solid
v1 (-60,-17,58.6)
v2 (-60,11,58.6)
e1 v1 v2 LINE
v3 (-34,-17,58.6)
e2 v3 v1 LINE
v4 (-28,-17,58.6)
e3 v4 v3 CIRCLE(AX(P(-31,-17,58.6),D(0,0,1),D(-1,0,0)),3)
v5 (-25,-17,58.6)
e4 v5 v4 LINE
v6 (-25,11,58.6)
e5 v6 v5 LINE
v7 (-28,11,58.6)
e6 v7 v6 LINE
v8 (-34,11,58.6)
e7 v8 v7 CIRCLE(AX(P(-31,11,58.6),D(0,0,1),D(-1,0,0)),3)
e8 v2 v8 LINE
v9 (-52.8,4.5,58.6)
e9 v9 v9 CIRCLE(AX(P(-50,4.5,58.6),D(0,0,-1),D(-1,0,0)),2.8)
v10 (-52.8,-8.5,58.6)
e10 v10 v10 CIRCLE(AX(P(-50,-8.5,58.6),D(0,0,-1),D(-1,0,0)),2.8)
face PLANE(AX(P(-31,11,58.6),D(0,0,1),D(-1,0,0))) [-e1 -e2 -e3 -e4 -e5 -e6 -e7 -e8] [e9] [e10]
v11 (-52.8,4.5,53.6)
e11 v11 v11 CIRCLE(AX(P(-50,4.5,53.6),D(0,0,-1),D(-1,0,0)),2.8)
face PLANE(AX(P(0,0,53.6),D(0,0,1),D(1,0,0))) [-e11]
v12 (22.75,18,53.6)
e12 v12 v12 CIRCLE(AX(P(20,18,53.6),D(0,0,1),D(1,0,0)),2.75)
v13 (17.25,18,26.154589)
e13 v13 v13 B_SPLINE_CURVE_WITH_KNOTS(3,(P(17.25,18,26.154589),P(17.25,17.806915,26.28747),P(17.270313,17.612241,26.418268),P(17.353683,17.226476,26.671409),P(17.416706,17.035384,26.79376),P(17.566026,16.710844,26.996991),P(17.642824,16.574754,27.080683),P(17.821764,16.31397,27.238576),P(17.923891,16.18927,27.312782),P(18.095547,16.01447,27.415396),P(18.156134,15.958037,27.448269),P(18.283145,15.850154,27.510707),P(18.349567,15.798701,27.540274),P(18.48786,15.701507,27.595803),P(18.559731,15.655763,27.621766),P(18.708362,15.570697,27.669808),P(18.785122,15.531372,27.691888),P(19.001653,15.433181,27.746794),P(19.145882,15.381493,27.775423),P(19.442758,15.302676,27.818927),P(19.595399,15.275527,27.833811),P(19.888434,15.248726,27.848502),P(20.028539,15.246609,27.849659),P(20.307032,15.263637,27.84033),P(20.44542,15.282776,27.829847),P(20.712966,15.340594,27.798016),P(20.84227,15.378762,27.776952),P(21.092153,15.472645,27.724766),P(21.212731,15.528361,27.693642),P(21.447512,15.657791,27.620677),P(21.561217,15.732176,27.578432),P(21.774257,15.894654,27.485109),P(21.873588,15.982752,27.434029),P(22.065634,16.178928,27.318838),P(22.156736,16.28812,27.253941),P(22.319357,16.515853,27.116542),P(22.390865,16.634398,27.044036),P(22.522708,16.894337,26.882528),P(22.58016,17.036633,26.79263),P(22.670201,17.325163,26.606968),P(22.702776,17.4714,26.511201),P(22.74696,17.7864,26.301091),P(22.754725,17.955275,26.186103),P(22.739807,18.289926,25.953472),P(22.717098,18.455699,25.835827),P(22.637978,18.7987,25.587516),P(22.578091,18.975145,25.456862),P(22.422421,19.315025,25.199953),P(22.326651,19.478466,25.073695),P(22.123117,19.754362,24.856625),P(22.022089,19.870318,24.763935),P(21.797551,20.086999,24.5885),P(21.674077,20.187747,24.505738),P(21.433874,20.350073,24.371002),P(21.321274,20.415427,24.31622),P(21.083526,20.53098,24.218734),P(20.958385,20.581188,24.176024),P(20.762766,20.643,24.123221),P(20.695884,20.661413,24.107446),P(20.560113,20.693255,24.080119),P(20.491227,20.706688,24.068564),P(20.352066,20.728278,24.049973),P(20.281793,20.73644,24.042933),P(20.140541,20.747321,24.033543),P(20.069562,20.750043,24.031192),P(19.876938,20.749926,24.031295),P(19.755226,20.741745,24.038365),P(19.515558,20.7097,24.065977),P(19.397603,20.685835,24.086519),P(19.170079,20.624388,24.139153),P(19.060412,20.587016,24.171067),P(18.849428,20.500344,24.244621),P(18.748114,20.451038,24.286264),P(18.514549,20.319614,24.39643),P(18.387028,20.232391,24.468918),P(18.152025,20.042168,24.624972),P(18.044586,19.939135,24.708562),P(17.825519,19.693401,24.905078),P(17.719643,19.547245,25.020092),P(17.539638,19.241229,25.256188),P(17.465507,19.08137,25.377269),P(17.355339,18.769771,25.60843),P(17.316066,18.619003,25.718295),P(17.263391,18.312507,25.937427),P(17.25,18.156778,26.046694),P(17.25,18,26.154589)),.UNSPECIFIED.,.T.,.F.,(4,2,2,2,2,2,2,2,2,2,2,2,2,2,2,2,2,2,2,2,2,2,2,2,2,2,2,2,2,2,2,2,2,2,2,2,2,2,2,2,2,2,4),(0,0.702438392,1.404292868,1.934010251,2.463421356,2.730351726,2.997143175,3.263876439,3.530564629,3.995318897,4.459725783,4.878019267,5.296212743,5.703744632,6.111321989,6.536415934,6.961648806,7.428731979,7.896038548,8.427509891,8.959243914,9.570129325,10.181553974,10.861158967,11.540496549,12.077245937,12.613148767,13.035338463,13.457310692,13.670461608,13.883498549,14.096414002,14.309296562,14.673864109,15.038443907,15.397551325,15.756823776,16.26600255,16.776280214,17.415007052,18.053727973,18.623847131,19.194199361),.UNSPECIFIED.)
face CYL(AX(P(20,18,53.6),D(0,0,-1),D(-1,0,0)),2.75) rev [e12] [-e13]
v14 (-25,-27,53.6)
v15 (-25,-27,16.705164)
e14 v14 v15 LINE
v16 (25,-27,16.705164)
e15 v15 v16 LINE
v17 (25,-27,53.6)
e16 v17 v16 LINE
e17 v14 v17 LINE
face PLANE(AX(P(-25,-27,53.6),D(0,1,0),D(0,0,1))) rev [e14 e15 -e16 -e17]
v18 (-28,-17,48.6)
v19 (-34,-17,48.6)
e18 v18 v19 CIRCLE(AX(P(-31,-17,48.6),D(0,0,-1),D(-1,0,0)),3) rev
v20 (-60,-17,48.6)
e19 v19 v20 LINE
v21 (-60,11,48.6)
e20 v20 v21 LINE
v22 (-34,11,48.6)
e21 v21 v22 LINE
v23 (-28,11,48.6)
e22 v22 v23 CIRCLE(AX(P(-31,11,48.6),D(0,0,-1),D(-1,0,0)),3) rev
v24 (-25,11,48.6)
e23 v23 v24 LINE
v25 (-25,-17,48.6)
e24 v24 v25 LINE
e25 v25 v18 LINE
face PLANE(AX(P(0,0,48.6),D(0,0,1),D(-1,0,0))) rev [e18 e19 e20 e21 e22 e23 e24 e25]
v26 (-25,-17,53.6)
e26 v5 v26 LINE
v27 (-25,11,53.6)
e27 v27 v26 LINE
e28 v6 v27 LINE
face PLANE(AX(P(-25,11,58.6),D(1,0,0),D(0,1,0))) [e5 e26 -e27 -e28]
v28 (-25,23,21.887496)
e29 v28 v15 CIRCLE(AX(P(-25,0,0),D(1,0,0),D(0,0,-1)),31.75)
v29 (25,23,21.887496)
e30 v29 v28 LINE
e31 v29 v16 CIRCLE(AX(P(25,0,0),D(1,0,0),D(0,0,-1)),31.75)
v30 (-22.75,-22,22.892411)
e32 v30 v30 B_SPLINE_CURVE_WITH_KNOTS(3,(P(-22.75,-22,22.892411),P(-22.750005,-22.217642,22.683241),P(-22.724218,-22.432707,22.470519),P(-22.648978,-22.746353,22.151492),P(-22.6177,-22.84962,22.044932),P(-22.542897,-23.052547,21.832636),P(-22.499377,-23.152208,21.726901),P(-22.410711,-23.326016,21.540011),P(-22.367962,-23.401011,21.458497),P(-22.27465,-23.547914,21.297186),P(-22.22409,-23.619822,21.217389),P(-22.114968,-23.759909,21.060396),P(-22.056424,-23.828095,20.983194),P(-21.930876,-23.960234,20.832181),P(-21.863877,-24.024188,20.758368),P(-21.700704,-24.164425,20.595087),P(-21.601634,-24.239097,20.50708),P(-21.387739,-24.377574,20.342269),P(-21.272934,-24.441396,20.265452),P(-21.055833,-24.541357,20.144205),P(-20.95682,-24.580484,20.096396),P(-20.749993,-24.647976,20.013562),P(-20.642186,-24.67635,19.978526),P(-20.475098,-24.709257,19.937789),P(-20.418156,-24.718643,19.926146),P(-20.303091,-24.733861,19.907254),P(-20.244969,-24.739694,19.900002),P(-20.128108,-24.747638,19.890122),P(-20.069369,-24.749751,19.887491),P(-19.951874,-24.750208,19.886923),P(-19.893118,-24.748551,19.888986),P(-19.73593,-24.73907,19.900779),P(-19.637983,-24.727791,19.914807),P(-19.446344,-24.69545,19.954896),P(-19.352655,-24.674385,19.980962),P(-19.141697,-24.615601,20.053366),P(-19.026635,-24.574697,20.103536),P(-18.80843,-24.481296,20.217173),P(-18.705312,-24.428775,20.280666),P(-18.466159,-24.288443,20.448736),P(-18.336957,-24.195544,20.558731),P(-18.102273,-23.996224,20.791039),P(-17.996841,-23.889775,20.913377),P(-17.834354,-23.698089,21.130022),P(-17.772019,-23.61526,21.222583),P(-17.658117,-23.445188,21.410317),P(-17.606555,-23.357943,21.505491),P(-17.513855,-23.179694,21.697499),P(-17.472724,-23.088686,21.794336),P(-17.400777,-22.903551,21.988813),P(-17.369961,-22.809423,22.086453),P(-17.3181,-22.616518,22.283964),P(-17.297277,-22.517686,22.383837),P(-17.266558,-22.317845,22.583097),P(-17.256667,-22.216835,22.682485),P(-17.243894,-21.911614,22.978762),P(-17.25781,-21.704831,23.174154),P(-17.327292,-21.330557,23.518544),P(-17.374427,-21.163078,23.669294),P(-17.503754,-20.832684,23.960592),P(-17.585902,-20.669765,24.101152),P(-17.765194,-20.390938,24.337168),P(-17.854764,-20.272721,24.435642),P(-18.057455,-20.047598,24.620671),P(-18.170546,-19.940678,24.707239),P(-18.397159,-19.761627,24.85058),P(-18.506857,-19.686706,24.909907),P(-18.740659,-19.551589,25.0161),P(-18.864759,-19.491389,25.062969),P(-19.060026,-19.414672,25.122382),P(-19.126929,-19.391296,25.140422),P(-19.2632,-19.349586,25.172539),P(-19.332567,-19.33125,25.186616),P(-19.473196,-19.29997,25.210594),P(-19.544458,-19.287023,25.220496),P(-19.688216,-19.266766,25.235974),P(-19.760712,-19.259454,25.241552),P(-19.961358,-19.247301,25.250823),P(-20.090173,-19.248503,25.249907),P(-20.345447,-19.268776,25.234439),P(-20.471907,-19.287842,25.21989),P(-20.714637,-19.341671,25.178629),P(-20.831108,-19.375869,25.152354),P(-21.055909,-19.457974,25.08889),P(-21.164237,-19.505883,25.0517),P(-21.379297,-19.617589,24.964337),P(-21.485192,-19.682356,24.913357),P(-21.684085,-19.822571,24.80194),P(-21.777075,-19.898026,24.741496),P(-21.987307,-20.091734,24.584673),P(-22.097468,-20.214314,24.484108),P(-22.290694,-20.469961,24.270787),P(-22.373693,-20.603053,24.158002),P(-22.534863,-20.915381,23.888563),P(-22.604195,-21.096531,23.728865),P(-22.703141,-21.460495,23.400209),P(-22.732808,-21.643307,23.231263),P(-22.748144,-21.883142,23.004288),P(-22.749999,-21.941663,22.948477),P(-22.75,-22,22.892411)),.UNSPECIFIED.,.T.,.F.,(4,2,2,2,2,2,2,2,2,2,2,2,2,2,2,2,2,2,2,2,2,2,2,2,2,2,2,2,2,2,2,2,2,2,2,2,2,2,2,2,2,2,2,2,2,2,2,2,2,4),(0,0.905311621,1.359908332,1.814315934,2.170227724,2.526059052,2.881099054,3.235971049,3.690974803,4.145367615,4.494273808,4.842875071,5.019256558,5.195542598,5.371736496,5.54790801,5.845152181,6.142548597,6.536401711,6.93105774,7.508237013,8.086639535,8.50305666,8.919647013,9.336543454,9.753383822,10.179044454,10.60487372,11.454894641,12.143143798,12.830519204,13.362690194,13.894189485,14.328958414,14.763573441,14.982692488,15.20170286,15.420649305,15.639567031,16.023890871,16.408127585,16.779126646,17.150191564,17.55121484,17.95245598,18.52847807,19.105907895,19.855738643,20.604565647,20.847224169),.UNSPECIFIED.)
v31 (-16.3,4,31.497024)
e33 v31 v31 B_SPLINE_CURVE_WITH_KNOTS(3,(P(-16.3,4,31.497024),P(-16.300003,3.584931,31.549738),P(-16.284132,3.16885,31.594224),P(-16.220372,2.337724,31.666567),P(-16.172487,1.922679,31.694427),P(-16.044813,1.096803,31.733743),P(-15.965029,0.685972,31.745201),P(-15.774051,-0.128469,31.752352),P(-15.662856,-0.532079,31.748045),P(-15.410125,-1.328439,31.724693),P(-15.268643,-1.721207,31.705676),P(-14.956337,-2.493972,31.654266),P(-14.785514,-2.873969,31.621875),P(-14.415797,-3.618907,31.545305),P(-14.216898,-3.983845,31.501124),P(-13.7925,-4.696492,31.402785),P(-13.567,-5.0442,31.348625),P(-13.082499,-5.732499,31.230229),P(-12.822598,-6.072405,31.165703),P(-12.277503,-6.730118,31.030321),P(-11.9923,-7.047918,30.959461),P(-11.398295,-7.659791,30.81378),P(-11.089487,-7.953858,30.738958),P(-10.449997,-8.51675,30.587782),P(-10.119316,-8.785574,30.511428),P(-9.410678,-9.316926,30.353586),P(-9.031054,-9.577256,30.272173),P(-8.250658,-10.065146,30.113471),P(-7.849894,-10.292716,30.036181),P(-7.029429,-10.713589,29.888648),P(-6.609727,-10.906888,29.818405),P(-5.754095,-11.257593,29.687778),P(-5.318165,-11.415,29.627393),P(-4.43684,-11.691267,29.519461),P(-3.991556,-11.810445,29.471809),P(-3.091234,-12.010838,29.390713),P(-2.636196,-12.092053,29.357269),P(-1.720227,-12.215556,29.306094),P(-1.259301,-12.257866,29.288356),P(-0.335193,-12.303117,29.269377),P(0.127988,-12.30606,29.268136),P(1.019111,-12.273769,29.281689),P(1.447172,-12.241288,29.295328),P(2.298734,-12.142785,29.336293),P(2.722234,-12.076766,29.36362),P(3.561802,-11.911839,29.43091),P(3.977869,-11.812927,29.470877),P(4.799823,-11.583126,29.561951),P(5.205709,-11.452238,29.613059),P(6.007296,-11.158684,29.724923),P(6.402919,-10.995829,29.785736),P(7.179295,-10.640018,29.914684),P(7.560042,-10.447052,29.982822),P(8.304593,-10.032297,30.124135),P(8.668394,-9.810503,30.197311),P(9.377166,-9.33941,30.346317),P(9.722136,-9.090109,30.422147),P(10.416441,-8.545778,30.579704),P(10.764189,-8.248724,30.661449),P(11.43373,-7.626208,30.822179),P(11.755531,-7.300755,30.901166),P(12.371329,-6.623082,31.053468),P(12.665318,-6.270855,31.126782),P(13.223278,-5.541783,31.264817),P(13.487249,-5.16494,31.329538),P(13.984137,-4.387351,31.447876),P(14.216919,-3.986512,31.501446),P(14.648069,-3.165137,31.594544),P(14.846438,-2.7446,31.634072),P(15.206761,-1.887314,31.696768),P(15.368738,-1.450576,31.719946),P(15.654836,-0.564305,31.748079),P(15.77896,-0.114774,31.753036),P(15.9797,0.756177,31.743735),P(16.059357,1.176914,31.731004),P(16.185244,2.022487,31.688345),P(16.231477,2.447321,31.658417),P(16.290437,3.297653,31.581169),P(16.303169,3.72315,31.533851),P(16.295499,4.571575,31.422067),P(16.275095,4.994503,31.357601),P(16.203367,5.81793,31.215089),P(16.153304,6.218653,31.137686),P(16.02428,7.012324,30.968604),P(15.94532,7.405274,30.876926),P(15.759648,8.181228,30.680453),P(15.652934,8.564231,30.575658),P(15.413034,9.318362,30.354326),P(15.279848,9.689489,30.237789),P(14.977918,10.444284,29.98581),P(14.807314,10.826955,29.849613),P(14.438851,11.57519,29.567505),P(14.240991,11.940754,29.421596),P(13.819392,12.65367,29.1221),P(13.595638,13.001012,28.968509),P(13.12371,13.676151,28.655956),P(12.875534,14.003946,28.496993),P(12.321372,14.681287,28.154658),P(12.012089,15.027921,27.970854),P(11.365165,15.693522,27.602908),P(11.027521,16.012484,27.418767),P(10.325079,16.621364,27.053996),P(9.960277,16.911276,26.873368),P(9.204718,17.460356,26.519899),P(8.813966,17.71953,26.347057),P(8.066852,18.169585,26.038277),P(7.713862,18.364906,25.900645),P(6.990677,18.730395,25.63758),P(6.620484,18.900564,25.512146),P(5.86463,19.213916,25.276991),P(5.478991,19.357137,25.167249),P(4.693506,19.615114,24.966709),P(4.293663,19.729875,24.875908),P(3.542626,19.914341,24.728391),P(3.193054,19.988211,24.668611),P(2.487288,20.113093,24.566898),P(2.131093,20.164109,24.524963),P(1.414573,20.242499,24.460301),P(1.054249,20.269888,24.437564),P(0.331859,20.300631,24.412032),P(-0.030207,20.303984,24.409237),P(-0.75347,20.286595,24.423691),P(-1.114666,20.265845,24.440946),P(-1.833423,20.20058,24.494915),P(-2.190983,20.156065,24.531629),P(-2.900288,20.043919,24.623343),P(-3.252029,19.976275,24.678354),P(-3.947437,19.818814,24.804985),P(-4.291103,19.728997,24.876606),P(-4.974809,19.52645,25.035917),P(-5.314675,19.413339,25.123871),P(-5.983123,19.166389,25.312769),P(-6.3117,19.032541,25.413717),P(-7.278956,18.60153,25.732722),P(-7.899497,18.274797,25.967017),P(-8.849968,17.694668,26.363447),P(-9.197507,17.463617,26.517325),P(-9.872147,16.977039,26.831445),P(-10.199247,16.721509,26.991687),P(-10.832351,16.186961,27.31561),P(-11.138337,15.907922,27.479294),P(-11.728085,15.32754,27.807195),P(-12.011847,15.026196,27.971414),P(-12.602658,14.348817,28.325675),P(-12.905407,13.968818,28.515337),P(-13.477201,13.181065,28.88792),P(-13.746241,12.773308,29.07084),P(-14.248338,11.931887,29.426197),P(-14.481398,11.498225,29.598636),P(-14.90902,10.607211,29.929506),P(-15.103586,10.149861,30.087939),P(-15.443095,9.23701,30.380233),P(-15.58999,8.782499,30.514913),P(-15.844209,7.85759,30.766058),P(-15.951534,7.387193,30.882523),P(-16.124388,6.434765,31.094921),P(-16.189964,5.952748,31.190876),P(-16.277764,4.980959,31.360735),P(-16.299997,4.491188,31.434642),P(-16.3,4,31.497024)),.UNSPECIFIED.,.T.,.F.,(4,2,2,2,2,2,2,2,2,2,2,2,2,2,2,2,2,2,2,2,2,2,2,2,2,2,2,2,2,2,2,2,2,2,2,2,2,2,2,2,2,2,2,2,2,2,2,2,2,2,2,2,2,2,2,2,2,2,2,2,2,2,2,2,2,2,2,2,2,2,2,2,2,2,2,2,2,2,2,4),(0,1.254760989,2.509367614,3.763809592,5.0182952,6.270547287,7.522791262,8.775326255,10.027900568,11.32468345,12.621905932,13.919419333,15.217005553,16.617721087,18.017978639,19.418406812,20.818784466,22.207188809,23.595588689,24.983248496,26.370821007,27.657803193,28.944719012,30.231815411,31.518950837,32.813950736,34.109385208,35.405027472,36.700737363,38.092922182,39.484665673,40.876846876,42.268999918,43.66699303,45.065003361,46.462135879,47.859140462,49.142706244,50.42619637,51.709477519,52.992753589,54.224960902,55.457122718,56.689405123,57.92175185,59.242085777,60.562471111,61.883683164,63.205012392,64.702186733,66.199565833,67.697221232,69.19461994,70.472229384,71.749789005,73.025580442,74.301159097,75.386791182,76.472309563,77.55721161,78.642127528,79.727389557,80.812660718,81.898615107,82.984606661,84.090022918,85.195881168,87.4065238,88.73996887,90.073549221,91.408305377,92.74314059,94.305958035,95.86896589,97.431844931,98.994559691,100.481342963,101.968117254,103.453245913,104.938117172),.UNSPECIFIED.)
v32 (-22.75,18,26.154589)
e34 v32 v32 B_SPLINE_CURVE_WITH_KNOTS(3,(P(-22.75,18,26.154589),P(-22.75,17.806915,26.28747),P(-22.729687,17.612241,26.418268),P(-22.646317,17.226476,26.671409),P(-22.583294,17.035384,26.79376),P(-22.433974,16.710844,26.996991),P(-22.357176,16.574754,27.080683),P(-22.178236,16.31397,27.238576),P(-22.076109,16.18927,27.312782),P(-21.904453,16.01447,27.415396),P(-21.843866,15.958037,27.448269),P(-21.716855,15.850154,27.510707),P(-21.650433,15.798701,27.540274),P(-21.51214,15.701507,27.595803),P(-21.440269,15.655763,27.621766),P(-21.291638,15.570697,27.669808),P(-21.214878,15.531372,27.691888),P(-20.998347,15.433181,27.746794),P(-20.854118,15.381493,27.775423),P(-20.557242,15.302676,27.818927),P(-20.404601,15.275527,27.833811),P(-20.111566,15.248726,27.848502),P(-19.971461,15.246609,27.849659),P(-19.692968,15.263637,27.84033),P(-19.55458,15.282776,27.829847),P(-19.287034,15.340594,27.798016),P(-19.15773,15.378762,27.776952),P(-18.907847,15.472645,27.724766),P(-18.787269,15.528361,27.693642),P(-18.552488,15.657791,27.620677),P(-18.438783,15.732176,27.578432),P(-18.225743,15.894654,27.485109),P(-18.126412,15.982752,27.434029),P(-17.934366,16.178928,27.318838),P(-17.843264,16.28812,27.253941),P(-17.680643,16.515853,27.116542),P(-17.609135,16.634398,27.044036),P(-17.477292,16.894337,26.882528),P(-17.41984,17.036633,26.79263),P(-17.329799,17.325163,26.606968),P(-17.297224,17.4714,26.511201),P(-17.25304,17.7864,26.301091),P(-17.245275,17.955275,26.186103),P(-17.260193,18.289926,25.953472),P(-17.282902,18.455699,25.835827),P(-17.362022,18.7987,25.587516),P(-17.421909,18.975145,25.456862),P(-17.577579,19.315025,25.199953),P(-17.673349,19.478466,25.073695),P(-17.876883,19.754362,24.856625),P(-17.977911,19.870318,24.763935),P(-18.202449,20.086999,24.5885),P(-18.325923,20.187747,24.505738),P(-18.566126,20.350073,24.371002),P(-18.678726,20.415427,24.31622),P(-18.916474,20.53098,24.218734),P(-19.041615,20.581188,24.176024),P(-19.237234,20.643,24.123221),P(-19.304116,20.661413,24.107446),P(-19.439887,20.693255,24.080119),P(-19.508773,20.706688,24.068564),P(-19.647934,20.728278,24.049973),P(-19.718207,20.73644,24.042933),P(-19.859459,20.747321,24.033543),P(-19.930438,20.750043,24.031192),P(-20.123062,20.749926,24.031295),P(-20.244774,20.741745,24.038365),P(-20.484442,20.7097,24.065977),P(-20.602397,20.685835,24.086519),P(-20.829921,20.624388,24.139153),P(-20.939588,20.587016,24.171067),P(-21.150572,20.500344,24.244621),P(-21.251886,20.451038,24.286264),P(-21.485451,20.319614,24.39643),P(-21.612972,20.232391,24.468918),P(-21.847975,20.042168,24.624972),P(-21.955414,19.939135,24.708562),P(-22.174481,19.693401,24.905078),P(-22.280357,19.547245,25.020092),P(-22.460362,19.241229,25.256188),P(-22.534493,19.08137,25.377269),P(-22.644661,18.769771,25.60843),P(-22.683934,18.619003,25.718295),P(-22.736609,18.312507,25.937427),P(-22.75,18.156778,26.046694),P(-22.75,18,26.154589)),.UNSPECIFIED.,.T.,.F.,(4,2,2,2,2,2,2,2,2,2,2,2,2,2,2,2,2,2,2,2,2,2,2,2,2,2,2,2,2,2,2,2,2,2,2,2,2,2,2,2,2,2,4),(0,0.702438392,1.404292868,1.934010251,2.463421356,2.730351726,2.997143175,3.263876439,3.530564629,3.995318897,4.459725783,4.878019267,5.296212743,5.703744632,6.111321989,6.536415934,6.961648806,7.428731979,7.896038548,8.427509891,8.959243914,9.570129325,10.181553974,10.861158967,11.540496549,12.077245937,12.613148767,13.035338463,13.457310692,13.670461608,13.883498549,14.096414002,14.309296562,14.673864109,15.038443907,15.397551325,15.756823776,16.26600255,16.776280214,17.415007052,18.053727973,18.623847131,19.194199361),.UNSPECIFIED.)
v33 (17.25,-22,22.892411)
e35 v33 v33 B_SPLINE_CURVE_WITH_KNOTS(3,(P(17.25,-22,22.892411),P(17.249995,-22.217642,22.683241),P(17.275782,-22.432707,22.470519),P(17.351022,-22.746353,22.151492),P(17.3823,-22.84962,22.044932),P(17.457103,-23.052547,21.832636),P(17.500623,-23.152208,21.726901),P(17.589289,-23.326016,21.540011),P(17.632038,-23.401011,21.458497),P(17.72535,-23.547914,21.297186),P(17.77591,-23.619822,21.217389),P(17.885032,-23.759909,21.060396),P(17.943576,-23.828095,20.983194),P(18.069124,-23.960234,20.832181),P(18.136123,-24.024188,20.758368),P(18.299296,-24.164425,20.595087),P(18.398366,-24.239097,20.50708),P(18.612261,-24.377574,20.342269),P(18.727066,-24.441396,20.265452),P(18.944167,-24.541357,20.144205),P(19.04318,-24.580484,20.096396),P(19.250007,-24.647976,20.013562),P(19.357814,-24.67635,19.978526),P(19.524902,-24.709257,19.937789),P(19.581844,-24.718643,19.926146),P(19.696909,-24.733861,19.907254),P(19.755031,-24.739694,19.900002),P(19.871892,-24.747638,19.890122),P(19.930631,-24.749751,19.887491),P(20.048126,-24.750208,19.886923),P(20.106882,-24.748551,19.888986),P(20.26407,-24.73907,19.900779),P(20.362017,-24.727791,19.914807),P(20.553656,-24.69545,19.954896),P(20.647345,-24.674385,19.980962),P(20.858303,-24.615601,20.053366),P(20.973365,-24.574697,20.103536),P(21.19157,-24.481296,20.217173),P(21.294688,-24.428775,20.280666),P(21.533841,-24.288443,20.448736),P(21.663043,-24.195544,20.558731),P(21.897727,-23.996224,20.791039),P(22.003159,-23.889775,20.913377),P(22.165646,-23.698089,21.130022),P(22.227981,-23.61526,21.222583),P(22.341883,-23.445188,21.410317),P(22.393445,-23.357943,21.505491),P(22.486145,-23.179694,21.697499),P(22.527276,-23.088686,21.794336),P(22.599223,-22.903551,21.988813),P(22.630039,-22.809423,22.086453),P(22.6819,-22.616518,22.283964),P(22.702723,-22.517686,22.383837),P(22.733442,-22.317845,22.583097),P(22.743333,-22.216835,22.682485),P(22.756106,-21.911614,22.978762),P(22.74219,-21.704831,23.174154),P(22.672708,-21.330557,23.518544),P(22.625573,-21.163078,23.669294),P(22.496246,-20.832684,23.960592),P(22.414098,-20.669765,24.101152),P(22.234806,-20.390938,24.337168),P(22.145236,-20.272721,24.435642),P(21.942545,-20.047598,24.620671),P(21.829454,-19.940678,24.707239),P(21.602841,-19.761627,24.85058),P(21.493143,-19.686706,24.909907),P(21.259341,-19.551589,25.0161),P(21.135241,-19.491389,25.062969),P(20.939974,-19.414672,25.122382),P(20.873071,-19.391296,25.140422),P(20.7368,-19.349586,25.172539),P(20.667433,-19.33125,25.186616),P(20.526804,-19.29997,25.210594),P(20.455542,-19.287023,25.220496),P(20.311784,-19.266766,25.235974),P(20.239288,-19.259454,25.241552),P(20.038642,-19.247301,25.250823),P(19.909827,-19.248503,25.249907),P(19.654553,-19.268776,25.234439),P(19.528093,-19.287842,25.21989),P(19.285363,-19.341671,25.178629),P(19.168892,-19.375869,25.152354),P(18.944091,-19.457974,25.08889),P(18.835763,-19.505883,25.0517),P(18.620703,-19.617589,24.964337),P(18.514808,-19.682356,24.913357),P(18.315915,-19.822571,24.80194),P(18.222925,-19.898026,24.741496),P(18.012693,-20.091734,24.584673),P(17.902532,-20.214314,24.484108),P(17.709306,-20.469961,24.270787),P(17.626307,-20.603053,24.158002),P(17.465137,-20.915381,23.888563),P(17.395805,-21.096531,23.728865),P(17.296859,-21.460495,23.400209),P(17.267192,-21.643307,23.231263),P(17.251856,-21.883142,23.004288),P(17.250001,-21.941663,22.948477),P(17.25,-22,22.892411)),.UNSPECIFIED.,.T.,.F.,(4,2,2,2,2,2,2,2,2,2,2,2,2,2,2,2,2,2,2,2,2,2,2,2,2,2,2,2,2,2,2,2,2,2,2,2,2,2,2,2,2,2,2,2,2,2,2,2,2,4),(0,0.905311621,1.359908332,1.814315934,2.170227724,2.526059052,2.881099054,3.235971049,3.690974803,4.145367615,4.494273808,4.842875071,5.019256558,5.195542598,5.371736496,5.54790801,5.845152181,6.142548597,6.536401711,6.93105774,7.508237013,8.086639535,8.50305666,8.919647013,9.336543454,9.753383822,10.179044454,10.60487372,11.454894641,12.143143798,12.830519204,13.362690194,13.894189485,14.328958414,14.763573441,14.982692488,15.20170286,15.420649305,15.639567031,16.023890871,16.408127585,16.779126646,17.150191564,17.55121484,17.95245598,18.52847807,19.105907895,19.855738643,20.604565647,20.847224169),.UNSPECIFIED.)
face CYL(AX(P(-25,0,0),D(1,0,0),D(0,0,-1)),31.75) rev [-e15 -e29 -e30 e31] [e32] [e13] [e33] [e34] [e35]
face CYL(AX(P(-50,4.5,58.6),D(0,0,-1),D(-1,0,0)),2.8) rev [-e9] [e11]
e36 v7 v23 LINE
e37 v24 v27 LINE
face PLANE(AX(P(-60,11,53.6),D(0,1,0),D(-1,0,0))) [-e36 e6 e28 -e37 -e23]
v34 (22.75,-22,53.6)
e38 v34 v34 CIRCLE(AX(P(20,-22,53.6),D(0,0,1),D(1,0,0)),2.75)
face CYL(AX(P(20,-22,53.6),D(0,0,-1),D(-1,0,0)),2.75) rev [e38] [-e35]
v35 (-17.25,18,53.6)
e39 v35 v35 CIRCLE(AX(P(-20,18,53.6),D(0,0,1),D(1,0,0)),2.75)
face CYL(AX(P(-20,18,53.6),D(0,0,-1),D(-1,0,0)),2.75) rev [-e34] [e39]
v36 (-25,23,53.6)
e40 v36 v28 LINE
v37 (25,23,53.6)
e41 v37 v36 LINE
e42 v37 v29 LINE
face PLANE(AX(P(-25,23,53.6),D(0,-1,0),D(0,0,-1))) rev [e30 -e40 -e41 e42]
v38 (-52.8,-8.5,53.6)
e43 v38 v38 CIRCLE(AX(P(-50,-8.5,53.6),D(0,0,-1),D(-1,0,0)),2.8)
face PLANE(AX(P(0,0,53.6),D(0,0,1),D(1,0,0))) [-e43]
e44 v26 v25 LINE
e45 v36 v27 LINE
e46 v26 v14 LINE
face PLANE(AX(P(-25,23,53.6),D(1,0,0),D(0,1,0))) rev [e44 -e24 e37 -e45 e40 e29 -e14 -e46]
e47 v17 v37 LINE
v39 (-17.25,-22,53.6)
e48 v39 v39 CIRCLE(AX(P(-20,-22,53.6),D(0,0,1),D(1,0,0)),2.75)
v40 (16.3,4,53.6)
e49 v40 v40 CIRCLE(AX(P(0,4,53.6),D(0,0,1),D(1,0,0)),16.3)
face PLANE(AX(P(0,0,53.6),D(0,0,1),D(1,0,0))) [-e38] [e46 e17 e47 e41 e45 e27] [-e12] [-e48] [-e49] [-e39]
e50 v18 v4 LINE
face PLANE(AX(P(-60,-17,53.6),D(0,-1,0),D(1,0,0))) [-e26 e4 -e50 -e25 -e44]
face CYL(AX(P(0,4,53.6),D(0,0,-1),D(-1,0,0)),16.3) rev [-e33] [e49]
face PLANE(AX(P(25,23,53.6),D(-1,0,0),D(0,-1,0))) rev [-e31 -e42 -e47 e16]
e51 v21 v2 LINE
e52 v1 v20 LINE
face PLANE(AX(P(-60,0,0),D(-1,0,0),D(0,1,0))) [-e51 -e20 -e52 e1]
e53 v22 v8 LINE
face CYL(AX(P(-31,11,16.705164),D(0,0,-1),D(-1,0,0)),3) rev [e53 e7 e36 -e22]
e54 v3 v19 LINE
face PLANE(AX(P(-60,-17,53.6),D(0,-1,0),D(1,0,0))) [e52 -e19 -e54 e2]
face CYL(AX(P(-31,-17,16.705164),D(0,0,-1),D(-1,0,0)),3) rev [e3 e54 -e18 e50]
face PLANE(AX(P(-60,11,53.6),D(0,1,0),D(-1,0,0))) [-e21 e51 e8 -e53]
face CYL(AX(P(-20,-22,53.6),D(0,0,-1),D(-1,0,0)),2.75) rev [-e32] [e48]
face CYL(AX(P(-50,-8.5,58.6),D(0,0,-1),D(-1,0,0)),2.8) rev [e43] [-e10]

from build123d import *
from build123d.topology import SkipClean

# Parameters (mm, degrees)
SKETCH1_W               = 50
SKETCH1_H               = 50
SKETCH1_R               = 2.75
SKETCH1_R_2             = 16.3
BOSS_EXTRUDE1_DEPTH     = 53.6
CUT_EXTRUDE1_DEPTH      = 66.015075175
CUT_EXTRUDE1_DEPTH_BACK = 66.015075175
SKETCH2_R               = 31.75
BOSS_EXTRUDE3_START     = 35
BOSS_EXTRUDE3_DEPTH     = 35
SKETCH9_R               = 3
CUT_EXTRUDE5_DEPTH      = 85.864362462
CUT_EXTRUDE6_DEPTH      = 76.433606288
CUT_EXTRUDE6_DEPTH_BACK = 10
SKETCH10_R              = 2.8
CUT_EXTRUDE8_START      = -5
CUT_EXTRUDE8_DEPTH      = 71.433606288
BOSS_EXTRUDE4_START     = 5
SKETCH13_3_R            = 2.8
BOSS_EXTRUDE4_DEPTH     = 5
CUT_EXTRUDE9_DEPTH      = 5
CUT_EXTRUDE9_DEPTH_BACK = 5
SKETCH13_4_R            = 2.8


with BuildPart() as part:
    # Sketch1 → Boss-Extrude1 (new body)
    with BuildSketch(Plane.XY):
        with Locations((0, -2)):
            Rectangle(SKETCH1_W, SKETCH1_H)
        with Locations((-20, 18)):
            Circle(SKETCH1_R, mode=Mode.SUBTRACT)
        with Locations((20, 18)):
            Circle(SKETCH1_R, mode=Mode.SUBTRACT)
        with Locations((20, -22)):
            Circle(SKETCH1_R, mode=Mode.SUBTRACT)
        with Locations((-20, -22)):
            Circle(SKETCH1_R, mode=Mode.SUBTRACT)
        with Locations((0, 4)):
            Circle(SKETCH1_R_2, mode=Mode.SUBTRACT)
    extrude(amount=BOSS_EXTRUDE1_DEPTH)

    # Sketch2 → Cut-Extrude1 (cut, two sides: drawn at the far end of the back side and taken through both)
    with BuildSketch(Plane(origin=(0, 0, 0), x_dir=(0, 0, -1), z_dir=(1, 0, 0)).offset(-CUT_EXTRUDE1_DEPTH_BACK)):
        Circle(SKETCH2_R)
    extrude(amount=CUT_EXTRUDE1_DEPTH + CUT_EXTRUDE1_DEPTH_BACK, mode=Mode.SUBTRACT)

    # Sketch4 → Boss-Extrude3 (add)
    with SkipClean():  # the faces are left unmerged after this step: merging them gives an invalid solid
        with BuildSketch(Plane(origin=(25, 0, 0), x_dir=(0, 0, -1), z_dir=(1, 0, 0)).offset(BOSS_EXTRUDE3_START)):
            with BuildLine():
                Line((-53.6, 11), (-53.6, -17))
                Line((-53.6, -17), (-26.815340759, -17))
                ThreePointArc((-26.815340759, -17), (-31.573087709, -3.347033393), (-29.783594477, 11))
                Line((-29.783594477, 11), (-53.6, 11))
            make_face()
        boss_extrude3 = extrude(amount=-BOSS_EXTRUDE3_DEPTH)

    # Sketch9 → Cut-Extrude5 (cut, symmetric)
    with SkipClean():  # the faces are left unmerged after this step: merging them gives an invalid solid
        with BuildSketch(Plane.XY):
            with Locations((31, 11)):
                Circle(SKETCH9_R)
            with Locations((31, -17)):
                Circle(SKETCH9_R)
        cut_extrude5 = extrude(amount=CUT_EXTRUDE5_DEPTH, both=True, mode=Mode.SUBTRACT)

    # Sketch10 → Cut-Extrude6 (cut, two sides: drawn at the far end of the back side and taken through both)
    with SkipClean():  # the faces are left unmerged after this step: merging them gives an invalid solid
        with BuildSketch(Plane.XY.offset(53.6).offset(-CUT_EXTRUDE6_DEPTH_BACK)):
            with Locations((50, 4.5)):
                Circle(SKETCH10_R)
            with Locations((50, -8.5)):
                Circle(SKETCH10_R)
        extrude(amount=CUT_EXTRUDE6_DEPTH + CUT_EXTRUDE6_DEPTH_BACK, mode=Mode.SUBTRACT)

    # Sketch13 → Cut-Extrude8 (cut, through all)
    with BuildSketch(Plane.XY.offset(53.6).offset(CUT_EXTRUDE8_START)):
        with BuildLine():
            Line((60, -17), (60, 11))
            Line((60, 11), (34, 11))
            ThreePointArc((34, 11), (31, 8), (28, 11))
            Line((28, 11), (25, 11))
            Line((25, 11), (25, -17))
            Line((25, -17), (28, -17))
            ThreePointArc((28, -17), (31, -14), (34, -17))
            Line((34, -17), (60, -17))
        make_face()
    cut_extrude8 = extrude(amount=-CUT_EXTRUDE8_DEPTH, mode=Mode.SUBTRACT)

    # Sketch13<3> → Boss-Extrude4 (add)
    with SkipClean():  # the faces are left unmerged after this step: merging them gives an invalid solid
        with BuildSketch(Plane.XY.offset(53.6).offset(BOSS_EXTRUDE4_START)):
            with BuildLine():
                Line((60, 11), (60, -17))
                Line((60, -17), (34, -17))
                ThreePointArc((34, -17), (31, -14), (28, -17))
                Line((28, -17), (25, -17))
                Line((25, -17), (25, 11))
                Line((25, 11), (28, 11))
                ThreePointArc((28, 11), (31, 8), (34, 11))
                Line((34, 11), (60, 11))
            make_face()
            with Locations((50, 4.5)):
                Circle(SKETCH13_3_R, mode=Mode.SUBTRACT)
            with Locations((50, -8.5)):
                Circle(SKETCH13_3_R, mode=Mode.SUBTRACT)
        boss_extrude4 = extrude(amount=-BOSS_EXTRUDE4_DEPTH)
    add(part.part.scale(1), mode=Mode.REPLACE)  # the faces are merged on a copy

    # Mirror3: Boss-Extrude3, Cut-Extrude5, Cut-Extrude8, Boss-Extrude4 across plane
    with SkipClean():  # the faces are left unmerged after this step: merging them gives an invalid solid
        add(boss_extrude3.mirror(Plane(origin=(0, 0, 0), x_dir=(0, 0, 1), z_dir=(1, 0, 0))))
        add(cut_extrude5.mirror(Plane(origin=(0, 0, 0), x_dir=(0, 0, 1), z_dir=(1, 0, 0))), mode=Mode.SUBTRACT)
        add(cut_extrude8.mirror(Plane(origin=(0, 0, 0), x_dir=(0, 0, 1), z_dir=(1, 0, 0))), mode=Mode.SUBTRACT)
        add(boss_extrude4.mirror(Plane(origin=(0, 0, 0), x_dir=(0, 0, 1), z_dir=(1, 0, 0))))
    add(part.part.scale(1), mode=Mode.REPLACE)  # the faces are merged on a copy

    # Sketch13<4> → Cut-Extrude9 (cut, two sides: drawn at the far end of the back side and taken through both)
    with SkipClean():  # the faces are left unmerged after this step: merging them gives an invalid solid
        with BuildSketch(Plane.XY.offset(53.6).offset(-CUT_EXTRUDE9_DEPTH_BACK)):
            with BuildLine():
                Line((60, 11), (60, -17))
                Line((60, -17), (34, -17))
                ThreePointArc((34, -17), (31, -14), (28, -17))
                Line((28, -17), (25, -17))
                Line((25, -17), (25, 11))
                Line((25, 11), (28, 11))
                ThreePointArc((28, 11), (31, 8), (34, 11))
                Line((34, 11), (60, 11))
            make_face()
            with Locations((50, 4.5)):
                Circle(SKETCH13_4_R, mode=Mode.SUBTRACT)
            with Locations((50, -8.5)):
                Circle(SKETCH13_4_R, mode=Mode.SUBTRACT)
        extrude(amount=CUT_EXTRUDE9_DEPTH + CUT_EXTRUDE9_DEPTH_BACK, mode=Mode.SUBTRACT)


solid = part.part
